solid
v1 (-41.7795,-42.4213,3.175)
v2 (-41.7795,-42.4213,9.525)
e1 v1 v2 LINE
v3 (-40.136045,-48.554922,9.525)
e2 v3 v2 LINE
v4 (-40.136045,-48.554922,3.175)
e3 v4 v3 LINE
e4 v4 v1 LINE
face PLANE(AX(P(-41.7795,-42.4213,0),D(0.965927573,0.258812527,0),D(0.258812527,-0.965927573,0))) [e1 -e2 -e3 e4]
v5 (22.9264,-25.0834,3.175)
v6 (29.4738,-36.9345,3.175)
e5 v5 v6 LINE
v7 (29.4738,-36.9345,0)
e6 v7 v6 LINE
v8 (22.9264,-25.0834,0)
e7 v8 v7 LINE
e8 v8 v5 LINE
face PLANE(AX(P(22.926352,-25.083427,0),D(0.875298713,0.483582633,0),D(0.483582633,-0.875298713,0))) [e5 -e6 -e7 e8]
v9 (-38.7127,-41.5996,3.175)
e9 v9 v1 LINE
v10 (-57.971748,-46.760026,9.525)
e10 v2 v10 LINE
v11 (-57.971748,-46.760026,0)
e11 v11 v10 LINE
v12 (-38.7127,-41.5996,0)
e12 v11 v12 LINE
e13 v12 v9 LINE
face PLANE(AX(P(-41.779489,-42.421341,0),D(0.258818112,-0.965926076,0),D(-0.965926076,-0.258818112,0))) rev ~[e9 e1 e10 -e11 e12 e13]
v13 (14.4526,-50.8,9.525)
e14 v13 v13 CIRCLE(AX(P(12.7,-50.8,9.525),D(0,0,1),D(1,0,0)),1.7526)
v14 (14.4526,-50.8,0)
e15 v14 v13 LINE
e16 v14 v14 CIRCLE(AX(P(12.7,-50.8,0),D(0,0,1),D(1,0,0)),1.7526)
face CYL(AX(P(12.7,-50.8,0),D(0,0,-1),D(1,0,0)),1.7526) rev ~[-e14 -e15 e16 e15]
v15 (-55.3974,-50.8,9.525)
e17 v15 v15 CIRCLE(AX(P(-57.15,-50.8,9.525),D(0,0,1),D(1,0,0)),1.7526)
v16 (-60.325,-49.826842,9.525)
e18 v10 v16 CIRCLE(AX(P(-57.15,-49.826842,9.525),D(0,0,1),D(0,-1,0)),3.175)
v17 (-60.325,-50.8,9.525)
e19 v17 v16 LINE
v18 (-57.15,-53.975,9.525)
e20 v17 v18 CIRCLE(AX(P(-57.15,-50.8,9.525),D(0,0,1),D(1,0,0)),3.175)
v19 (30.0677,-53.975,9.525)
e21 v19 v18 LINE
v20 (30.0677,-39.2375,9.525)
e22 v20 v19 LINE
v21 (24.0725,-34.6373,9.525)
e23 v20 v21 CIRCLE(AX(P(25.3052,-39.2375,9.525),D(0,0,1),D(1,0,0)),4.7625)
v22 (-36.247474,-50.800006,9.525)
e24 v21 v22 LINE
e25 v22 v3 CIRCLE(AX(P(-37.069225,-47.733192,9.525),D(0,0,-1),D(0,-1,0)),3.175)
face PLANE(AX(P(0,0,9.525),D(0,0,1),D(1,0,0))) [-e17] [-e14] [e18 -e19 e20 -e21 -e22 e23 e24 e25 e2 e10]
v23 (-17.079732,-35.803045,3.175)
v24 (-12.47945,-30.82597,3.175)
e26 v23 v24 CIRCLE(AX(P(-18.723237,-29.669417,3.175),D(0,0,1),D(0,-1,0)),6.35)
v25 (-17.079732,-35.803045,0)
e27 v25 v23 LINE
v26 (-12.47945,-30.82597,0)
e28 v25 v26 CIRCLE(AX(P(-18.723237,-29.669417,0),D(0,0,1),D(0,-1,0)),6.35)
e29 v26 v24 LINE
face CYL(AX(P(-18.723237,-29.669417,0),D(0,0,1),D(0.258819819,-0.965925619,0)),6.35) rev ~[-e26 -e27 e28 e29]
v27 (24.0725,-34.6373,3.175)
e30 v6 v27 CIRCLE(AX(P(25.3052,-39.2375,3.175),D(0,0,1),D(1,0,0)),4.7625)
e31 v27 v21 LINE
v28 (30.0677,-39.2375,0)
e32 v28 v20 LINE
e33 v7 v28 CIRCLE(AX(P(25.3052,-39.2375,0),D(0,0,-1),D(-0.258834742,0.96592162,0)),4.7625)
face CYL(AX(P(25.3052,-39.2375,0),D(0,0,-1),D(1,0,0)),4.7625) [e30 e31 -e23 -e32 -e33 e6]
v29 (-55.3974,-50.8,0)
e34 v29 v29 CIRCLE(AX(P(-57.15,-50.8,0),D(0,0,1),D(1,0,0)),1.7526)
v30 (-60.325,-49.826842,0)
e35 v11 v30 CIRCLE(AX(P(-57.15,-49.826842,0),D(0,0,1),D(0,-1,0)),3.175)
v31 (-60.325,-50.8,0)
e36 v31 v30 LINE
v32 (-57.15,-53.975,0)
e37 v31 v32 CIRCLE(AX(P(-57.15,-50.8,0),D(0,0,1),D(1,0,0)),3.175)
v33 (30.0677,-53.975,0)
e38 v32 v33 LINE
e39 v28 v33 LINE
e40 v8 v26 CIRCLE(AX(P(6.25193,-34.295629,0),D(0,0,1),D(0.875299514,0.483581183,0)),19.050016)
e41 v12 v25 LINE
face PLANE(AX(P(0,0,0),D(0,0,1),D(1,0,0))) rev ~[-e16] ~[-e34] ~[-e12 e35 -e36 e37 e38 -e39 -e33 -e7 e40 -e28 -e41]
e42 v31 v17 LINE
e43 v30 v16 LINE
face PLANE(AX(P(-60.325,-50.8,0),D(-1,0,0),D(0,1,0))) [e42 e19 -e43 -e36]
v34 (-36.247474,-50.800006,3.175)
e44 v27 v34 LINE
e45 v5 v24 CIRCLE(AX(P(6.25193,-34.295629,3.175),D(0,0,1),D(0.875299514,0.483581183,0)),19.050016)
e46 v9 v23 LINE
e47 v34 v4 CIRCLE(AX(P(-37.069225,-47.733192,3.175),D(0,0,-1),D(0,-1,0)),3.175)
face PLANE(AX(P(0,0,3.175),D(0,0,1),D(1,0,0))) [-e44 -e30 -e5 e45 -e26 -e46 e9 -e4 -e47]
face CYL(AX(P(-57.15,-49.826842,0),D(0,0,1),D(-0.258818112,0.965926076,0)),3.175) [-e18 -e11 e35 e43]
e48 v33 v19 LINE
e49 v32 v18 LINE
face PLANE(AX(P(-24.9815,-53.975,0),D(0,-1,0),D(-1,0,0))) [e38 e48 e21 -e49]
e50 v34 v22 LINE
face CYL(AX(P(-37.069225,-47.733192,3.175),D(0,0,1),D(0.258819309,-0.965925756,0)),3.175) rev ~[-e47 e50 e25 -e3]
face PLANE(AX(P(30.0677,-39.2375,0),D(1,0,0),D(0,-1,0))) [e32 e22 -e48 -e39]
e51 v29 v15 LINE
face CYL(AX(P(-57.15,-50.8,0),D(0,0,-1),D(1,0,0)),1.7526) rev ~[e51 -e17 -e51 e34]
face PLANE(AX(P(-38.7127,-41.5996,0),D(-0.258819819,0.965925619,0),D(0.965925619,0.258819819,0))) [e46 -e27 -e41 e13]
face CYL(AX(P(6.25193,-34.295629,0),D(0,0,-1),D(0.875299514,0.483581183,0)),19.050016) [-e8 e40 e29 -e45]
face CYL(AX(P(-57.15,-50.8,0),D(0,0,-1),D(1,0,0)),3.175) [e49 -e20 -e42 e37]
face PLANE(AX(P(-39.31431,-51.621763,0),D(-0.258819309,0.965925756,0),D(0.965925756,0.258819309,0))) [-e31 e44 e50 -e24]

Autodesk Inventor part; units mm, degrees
ref_plane "YZ Plane" through (0, 0, 0) normal (1, 0, 0) x (0, 1, 0)
ref_plane "XZ Plane" through (0, 0, 0) normal (0, 1, 0) x (-1, 0, 0)
ref_plane "XY Plane" through (0, 0, 0) normal (0, 0, 1) x (1, 0, 0)
sketch "Sketch2" plane through (0, 0, 0) normal (0, 0, 1) x (1, 0, 0)
  circle A0 centre (0, 0) radius 3.175 construction
  circle A1 centre (0, 0) radius 7.9375 construction
  line L0 (-24.9815, -53.975) -> (30.0677, -53.975)
  line L1 (-24.9815, -53.975) -> (-36.2864, -11.7845) construction
  line L2 (-36.2864, -11.7845) -> (-3.9688, 6.8741) construction
  line L3 (20.5427, -47.625) -> (-13.5349, -47.625)
  line L4 (-13.5349, -47.625) -> (-22.3476, -14.7355) construction
  line L5 (-22.3476, -14.7355) -> (-5.9414, -5.2634) construction
  line L6 (-18.5621, -41.1307) -> (-23.4926, -22.7298) construction
  line L7 (-23.4926, -22.7298) -> (-29.6262, -24.3733) construction
  line L8 (-29.6262, -24.3733) -> (-24.6957, -42.7742) construction
  line L9 (-24.6957, -42.7742) -> (-18.5621, -41.1307) construction
  line L10 (-18.5621, -41.1307) -> (-29.6262, -24.3733) construction
  line L11 (-23.4926, -22.7298) -> (-24.6957, -42.7742) construction
  circle A2 centre (-29.6262, -24.3733) radius 1.7526 construction
  circle A3 centre (-24.6957, -42.7742) radius 1.7526 construction
  circle A4 centre (-21.0273, -31.9303) radius 1.7526 construction
  line L12 (25.3052, -45.5804) -> (25.3052, -53.975)
  circle A5 centre (25.3052, -39.2375) radius 1.7526
  line L13 (0, 0) -> (-58.6646, -15.7191) construction
  line L14 (-24.0941, -32.752) -> (-30.6681, -8.2175) construction
  circle A6 centre (25.3052, -39.2375) radius 4.7625
  line L15 (30.0677, -39.2375) -> (30.0677, -53.975)
  line L16 (20.5427, -39.2375) -> (20.5427, -47.625)
  line L17 (-30.2278, -34.3955) -> (-17.9605, -31.1085) construction
  line L18 (-24.9815, -53.975) -> (-113.8815, -53.975)
  circle A7 centre (-9.9632, -48.6877) radius 1.7526
  line L19 (-9.9632, -48.6877) -> (-25.2973, -52.7964) construction
  line L20 (25.3052, -39.2375) -> (24.0725, -34.6373)
  line L21 (-31.2313, -30.6503) -> (-77.8688, -47.625) construction
  line L22 (-77.8688, -47.625) -> (-26.6829, -47.625) construction
  line L23 (-9.9632, -48.6877) -> (-10.4168, -46.9948) construction
  circle A8 centre (25.3052, -39.2375) radius 1.7526
  circle A9 centre (25.3052, -39.2375) radius 4.7625
  line L24 (17.994, -39.5531) -> (8.9547, -5.8181) construction
  line L25 (8.9547, -5.8181) -> (-22.4801, -14.241) construction
  line L26 (-22.4801, -14.241) -> (-13.4409, -47.976) construction
  line L27 (-0.2817, -44.45) -> (17.994, -39.5531) construction
  line L28 (17.994, -39.5531) -> (-22.4801, -14.241) construction
  line L29 (8.9547, -5.8181) -> (-13.4409, -47.976) construction
  line L30 (6.9477, 3.8384) -> (29.4738, -36.9345)
  line L31 (2.0544, -7.667) -> (8.9547, -5.8181) construction
  circle A10 centre (-9.9632, -48.6877) radius 4.7625
  line L32 (-0.2817, -44.45) -> (-14.3857, -44.45) construction
  line L33 (-113.8815, -53.975) -> (-32.8811, -24.4933) construction
  circle A11 centre (-54.7623, -40.9695) radius 1.7526 construction
  circle A12 centre (-54.7623, -40.9695) radius 7.9375 construction
  line L34 (-54.7623, -40.9695) -> (-56.8404, -33.2138) construction
  line L35 (-25.8322, -50.8) -> (-105.1582, -50.8) construction
  circle A13 centre (-57.15, -50.8) radius 1.7526
  circle A14 centre (-66.675, -50.8) radius 1.7526 construction
  circle A15 centre (-76.2, -50.8) radius 1.7526 construction
  circle A16 centre (-85.725, -50.8) radius 1.7526 construction
  circle A17 centre (12.7, -50.8) radius 1.7526
  line L36 (-2.2431, -26.897) -> (20.5536, -20.7887) construction
  line L37 (25.3052, -39.2375) -> (-9.9632, -48.6877) construction
  line L38 (26.5378, -43.8377) -> (-8.7306, -53.2879)
  line L39 (-48.0967, -53.975) -> (24.0725, -34.6373)
  arc A18 (26.5378, -43.8377) -> (24.0725, -34.6373) centre (25.3052, -39.2375) ccw
  arc A19 (-11.1958, -44.0874) -> (-8.7306, -53.2879) centre (-9.9632, -48.6877) ccw
  line L40 (-36.2475, -50.8) -> (-36.2475, -53.975) construction
  line L41 (-36.2475, -50.8) -> (-38.7127, -41.5996) construction
  line L42 (-38.7127, -41.5996) -> (-84.8985, -53.975)
  circle A20 centre (-37.0692, -47.7332) radius 3.175
  line L43 (-41.7795, -42.4213) -> (-39.3143, -51.6218)
  line L44 (-38.7127, -41.5996) -> (22.9264, -25.0834)
  arc A21 (22.9264, -25.0834) -> (-12.7947, -34.6548) centre (6.2519, -34.2957) ccw
  line L45 (-39.3143, -51.6218) -> (27.6718, -33.6729) construction
  circle A22 centre (-57.15, -50.8) radius 3.175
  line L46 (-60.325, -50.8) -> (-60.325, -47.3906)
  point P0 (30.0677, -39.2375)
  point P1 (-24.0941, -32.752)
  point P2 (-2.2431, -26.897)
  point P3 (-12.1309, -47.625)
  point P4 (-15.5208, -47.3441)
  point P5 (-14.3857, -44.45)
  point P6 (-9.6568, -46.9621)
  point P7 (-9.6568, -46.9621)
  point P8 (-48.0301, -36.7646)
  point P9 (-59.0876, -47.625)
  point P10 (-62.6223, -42.0757)
  point P11 (-50.4369, -47.625)
  point P12 (0.6918, 7.9073)
  point P13 (7.671, -43.9626)
  point P14 (26.5378, -43.8377)
  point P15 (-40.136, -48.5549)
  point P16 (-57.15, -53.975)
  dimension "d40" = 3.5052
  dimension "d6" = 6.35
  dimension "d7" = 15.875
  dimension "Angle_Mount" = 105
  dimension "d17" = 105
  dimension "d19" = 9.525
  dimension "d20" = 12.7
  dimension "d24" = 19.05
  dimension "d25" = 6.35
  dimension "d26" = 3.5052
  dimension "d27" = 3.5052
  dimension "d28" = 3.5052
  dimension "d29" = 6.35
  dimension "d33" = 3.5052
  dimension "d35" = 31.75
  dimension "d37" = 9.525
  dimension "d38" = 25.4
  dimension "d39" = 53.975
  dimension "d41" = 44.45
  dimension "Rail_Offset" = 36.5125
  dimension "d45" = 6.35
  dimension "d48" = 22.225
  dimension "d49" = 3.5052
  dimension "d51" = 9.525
  dimension "d52" = 32.5438
  dimension "d53" = 34.925
  dimension "d54" = 9.525
  dimension "d56" = 9.525
  dimension "d58" = 6.35
  dimension "d60" = 20
  dimension "d61" = 88.9
  dimension "d69" = 31.75
  dimension "d71" = 3.5052
  dimension "d72" = 15.875
  dimension "d74" = 3.175
  dimension "d75" = 3.5052
  dimension "d76" = 57.15
  dimension "d79" = 9.525
  dimension "d84" = 3.5052
  dimension "d85" = 69.85
  dimension "d106" = 3.175
  dimension "d107" = 9.525
  dimension "d109" = 6.35
  dimension "d113" = 19.05
  dimension "d122" = 9.525
extrude "Extrusion2" add sketch "Sketch2" along normal blind 9.525 contours L18 L39 A10 L38 L3 L16 A6 L15 L0 | L18 A22 L46 L42 L43 L39 | A22 | A6 | L38 L16 A6 | A10 | L39 A6 L16 L38 L3 A10 | L16 L3 L38 | A10 L3 L38 | A7 L3 | L3 A7 | A5
extrude "Extrusion3" add sketch "Sketch2" along normal blind 3.175 contours L43 A20 L39 | A20 L43 L42 L44 L30 A6 L39 | A20 | L38 L16 A6 | A10 | L39 A6 L16 L38 L3 A10 | L44 A21 | A10 L3 L38 | A7 L3 | L3 A7
fillet "Fillet6" radius 6.35 3 edges at (22.9264, -25.0834, 1.5875) (-12.7947, -34.6548, 1.5875) (29.4738, -36.9345, 1.5875)
fillet "Fillet7" radius 3.175 2 edges at (-39.3143, -51.6218, 6.35) (-60.325, -47.3906, 4.7625)
properties part number "Uprights" material "UHMW, White"
